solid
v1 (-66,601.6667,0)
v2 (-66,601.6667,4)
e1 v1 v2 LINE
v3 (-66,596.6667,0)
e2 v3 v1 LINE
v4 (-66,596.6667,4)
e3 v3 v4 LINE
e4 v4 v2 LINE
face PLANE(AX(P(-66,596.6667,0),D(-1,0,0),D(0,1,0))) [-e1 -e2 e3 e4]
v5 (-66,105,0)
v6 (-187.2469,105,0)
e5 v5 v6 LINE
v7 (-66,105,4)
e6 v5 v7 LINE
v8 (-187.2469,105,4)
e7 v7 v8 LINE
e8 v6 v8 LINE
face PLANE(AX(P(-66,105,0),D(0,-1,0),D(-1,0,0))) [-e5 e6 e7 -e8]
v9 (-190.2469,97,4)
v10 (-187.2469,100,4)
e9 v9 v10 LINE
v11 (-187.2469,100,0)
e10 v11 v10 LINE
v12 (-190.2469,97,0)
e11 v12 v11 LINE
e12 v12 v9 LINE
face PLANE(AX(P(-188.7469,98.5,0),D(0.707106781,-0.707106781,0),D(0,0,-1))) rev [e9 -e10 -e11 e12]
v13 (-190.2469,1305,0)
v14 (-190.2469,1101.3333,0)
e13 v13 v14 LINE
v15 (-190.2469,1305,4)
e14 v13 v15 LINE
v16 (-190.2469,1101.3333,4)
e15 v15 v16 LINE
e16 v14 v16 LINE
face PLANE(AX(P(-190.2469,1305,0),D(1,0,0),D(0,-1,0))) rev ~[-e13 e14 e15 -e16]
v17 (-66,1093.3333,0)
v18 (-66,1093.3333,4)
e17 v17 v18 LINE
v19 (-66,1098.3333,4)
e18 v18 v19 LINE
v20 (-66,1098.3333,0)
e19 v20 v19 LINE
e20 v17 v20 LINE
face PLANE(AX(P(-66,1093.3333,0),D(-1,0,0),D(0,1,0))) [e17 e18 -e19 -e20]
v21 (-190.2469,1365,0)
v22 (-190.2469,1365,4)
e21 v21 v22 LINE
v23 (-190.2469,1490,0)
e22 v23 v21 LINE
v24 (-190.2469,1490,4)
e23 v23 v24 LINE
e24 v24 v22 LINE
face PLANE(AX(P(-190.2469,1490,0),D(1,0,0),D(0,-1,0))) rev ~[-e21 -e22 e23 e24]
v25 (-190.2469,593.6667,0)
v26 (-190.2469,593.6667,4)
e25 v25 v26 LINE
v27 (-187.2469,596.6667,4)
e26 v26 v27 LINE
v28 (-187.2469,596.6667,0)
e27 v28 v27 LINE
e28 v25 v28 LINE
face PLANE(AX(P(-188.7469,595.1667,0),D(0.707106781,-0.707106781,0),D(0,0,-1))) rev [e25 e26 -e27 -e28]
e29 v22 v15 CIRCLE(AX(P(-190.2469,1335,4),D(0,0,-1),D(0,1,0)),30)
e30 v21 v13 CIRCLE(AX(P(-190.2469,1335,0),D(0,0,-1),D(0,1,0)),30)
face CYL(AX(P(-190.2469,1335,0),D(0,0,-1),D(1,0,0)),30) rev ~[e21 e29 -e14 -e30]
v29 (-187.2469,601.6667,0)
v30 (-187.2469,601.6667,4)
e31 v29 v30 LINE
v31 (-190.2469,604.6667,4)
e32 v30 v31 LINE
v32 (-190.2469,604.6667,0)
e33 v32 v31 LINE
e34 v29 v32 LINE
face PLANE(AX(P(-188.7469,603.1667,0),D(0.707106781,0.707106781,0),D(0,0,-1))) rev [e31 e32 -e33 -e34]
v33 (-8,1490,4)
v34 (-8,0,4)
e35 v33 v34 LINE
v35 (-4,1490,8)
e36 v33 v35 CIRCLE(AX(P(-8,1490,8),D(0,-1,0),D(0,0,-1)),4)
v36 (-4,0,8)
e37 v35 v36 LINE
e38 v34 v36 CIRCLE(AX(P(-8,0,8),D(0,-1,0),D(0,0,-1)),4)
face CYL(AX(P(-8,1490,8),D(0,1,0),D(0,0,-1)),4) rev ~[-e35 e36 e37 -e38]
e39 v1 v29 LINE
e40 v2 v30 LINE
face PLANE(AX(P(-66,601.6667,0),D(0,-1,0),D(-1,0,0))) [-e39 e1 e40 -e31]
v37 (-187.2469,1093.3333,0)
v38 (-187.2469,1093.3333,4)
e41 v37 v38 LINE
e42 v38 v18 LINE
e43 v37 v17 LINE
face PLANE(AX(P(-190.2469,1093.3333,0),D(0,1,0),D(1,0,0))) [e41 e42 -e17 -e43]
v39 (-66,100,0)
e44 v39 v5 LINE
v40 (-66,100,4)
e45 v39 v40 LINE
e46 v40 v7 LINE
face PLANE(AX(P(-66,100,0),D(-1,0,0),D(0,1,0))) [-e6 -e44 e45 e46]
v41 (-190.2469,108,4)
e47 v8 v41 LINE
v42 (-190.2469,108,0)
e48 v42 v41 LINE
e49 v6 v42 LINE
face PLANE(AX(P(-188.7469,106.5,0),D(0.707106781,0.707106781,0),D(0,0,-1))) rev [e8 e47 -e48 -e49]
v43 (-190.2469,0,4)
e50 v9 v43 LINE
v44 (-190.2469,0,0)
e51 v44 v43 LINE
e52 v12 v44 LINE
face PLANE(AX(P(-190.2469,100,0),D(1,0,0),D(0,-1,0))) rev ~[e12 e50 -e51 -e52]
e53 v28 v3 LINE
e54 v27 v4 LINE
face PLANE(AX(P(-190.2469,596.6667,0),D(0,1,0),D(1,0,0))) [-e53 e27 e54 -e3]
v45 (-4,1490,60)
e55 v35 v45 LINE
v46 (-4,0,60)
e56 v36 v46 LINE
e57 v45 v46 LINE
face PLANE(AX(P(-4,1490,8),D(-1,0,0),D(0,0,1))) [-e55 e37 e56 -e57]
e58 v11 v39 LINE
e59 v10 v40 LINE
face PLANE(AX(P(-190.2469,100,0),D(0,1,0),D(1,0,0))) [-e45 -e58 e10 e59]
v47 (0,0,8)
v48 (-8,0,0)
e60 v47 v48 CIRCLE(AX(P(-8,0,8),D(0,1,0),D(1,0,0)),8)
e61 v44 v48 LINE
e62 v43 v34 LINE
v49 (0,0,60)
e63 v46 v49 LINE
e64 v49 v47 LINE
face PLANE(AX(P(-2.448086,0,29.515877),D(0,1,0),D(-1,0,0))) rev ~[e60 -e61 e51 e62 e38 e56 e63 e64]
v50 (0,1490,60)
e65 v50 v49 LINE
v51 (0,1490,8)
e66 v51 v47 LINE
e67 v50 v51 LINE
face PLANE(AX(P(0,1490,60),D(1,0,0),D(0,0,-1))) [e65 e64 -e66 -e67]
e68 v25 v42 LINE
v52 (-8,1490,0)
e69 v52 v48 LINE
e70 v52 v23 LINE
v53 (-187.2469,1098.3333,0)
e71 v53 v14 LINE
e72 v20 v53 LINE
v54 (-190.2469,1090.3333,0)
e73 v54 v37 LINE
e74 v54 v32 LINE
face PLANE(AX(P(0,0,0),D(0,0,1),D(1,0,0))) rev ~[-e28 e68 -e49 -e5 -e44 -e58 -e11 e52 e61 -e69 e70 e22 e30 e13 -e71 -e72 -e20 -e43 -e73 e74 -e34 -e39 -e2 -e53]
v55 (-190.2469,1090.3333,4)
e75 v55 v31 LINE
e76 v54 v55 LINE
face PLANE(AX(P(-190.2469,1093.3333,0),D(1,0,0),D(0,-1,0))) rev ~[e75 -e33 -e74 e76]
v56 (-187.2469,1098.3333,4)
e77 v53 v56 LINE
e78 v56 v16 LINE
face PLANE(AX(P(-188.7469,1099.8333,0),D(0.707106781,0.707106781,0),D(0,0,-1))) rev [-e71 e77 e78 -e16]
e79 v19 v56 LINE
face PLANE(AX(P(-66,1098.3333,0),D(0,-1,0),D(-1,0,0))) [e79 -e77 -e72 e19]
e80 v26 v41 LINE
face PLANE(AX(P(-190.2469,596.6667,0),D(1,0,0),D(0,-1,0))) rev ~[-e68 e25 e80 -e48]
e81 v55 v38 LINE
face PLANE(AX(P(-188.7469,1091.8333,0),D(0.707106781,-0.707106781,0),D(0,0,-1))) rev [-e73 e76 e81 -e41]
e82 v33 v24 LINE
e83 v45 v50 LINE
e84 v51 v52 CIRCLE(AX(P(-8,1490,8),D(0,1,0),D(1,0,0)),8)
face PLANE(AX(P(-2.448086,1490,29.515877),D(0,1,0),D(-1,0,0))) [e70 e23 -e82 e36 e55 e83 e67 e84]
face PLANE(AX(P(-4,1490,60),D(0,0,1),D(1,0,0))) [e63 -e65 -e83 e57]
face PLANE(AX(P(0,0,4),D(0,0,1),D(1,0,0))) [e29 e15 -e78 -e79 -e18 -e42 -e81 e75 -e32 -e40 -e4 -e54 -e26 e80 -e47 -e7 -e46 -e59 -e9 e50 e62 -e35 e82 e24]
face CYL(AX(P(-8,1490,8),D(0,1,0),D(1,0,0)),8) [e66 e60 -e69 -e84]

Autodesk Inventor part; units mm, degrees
ref_plane "YZ Plane" through (0, 0, 0) normal (1, 0, 0) x (0, 1, 0)
ref_plane "XZ Plane" through (0, 0, 0) normal (0, 1, 0) x (-1, 0, 0)
ref_plane "XY Plane" through (0, 0, 0) normal (0, 0, 1) x (1, 0, 0)
sketch "Sketch1" plane through (0, 0, 0) normal (0, 0, 1) x (1, 0, 0)
  line L0 (0, 1490) -> (-190.2469, 1490)
  line L1 (-190.2469, 1490) -> (-190.2469, 0)
  line L2 (-190.2469, 0) -> (0, 0)
  line L3 (0, 0) -> (0, 1490)
  line L4 (-190.2469, 100) -> (-66, 100)
  line L5 (-66, 100) -> (-66, 105)
  line L6 (-66, 105) -> (-190.2469, 105)
  line L7 (-190.2469, 105) -> (-190.2469, 100)
  line L8 (-190.2469, 596.6667) -> (-66, 596.6667)
  line L9 (-66, 596.6667) -> (-66, 601.6667)
  line L10 (-66, 601.6667) -> (-190.2469, 601.6667)
  line L11 (-190.2469, 601.6667) -> (-190.2469, 596.6667)
  line L12 (-190.2469, 1093.3333) -> (-66, 1093.3333)
  line L13 (-66, 1093.3333) -> (-66, 1098.3333)
  line L14 (-66, 1098.3333) -> (-190.2469, 1098.3333)
  line L15 (-190.2469, 1098.3333) -> (-190.2469, 1093.3333)
  circle A0 centre (-190.2469, 1335) radius 30
  point P0 (-190.2469, 1098.3333)
  point P1 (-190.2469, 1093.3333)
  point P2 (-190.2469, 601.6667)
  point P3 (-190.2469, 596.6667)
  point P4 (-190.2469, 1365)
  point P5 (-190.2469, 1305)
  dimension "d0" = 1490
  dimension "d1" = 190.2469
  dimension "d2" = 5
  dimension "d4" = 100
  dimension "d7" = 496.6667
  dimension "d23" = 66
  dimension "d29" = 60
  dimension "d30" = 1335
extrude "Plate1" add sketch "Sketch1" along normal blind 4 contours L3 L2 L1 L4 L5 L6 L8 L9 L10 L12 L13 L14 A0 L0
sketch "Sketch2" plane through (-4, 1490, 0) normal (1, 0, 0) x (0, 1, 0)
  line L0 (-1490, 0) -> (0, 0)
  line L1 (0, 0) -> (0, 60)
  line L2 (0, 60) -> (-1490, 60)
  line L3 (-1490, 60) -> (-1490, 0)
edge flange "Flange1" height 60 angle 90 thickness 4 bend radius 4 thickness toward (1, 0, 0) relief tear relief width 4 relief depth 2 edges at (0, 745, 4) wall of the first edge with corners at (-4, 0, 0) (-4, 1490, 0) (-4, 1490, 60) (-4, 0, 60)
bend "Bend1"
corner "Corner1"
chamfer "Corner Chamfer1" distance 3 angle 45 6 edges at (-190.2469, 100, 2) (-190.2469, 105, 2) (-190.2469, 596.6667, 2) (-190.2469, 601.6667, 2) (-190.2469, 1098.3333, 2) (-190.2469, 1093.3333, 2)
equation "\"d0\" = Стрингер_длина"
equation "\"d1\" = стрингер_глубина_1"
equation "\"d2\" = паз_под_стрингер_толщина"
equation "\"d7\" = Шаг_шпангоутов"
equation "\"d23\" = паз_под_стрингер_глубина - Thickness"
equation "\"d29\" = 2 * радиус_выреза_под_сварку"
equation "\"d12\" = Thickness"
equation "\"d13\" = BendReliefWidth"
equation "\"d14\" = BendReliefDepth"
equation "\"d15\" = MinimumRemnant"
equation "\"d16\" = TransitionRadius"
equation "\"d17\" = ребро_усилителей"
equation "\"d19\" = BendRadius"
equation "\"d20\" = CornerReliefSize"
equation "\"d21\" = GapSize"
equation "\"d22\" = JacobiRadiusSize"
equation "\"BendRadius\" = Thickness"
equation "\"BendReliefWidth\" = Thickness"
equation "\"BendReliefDepth\" = 0.5 * Thickness"
equation "\"CornerReliefSize\" = 4 * Thickness"
equation "\"MinimumRemnant\" = 2 * Thickness"
equation "\"TransitionRadius\" = BendRadius"
equation "\"JacobiRadiusSize\" = BendRadius"
equation "\"GapSize\" = Thickness"
equation "\"Стрингер_длина\" = 1490"
equation "\"стрингер_глубина_1\" = 190.246925"
equation "\"паз_под_стрингер_толщина\" = 5"
equation "\"Шаг_шпангоутов\" = 496.666667"
equation "\"паз_под_стрингер_глубина\" = 70"
equation "\"Thickness\" = 4"
equation "\"радиус_выреза_под_сварку\" = 30"
equation "\"ребро_усилителей\" = 60"
properties part number "0234 GBK stringer 1" material "Steel"
